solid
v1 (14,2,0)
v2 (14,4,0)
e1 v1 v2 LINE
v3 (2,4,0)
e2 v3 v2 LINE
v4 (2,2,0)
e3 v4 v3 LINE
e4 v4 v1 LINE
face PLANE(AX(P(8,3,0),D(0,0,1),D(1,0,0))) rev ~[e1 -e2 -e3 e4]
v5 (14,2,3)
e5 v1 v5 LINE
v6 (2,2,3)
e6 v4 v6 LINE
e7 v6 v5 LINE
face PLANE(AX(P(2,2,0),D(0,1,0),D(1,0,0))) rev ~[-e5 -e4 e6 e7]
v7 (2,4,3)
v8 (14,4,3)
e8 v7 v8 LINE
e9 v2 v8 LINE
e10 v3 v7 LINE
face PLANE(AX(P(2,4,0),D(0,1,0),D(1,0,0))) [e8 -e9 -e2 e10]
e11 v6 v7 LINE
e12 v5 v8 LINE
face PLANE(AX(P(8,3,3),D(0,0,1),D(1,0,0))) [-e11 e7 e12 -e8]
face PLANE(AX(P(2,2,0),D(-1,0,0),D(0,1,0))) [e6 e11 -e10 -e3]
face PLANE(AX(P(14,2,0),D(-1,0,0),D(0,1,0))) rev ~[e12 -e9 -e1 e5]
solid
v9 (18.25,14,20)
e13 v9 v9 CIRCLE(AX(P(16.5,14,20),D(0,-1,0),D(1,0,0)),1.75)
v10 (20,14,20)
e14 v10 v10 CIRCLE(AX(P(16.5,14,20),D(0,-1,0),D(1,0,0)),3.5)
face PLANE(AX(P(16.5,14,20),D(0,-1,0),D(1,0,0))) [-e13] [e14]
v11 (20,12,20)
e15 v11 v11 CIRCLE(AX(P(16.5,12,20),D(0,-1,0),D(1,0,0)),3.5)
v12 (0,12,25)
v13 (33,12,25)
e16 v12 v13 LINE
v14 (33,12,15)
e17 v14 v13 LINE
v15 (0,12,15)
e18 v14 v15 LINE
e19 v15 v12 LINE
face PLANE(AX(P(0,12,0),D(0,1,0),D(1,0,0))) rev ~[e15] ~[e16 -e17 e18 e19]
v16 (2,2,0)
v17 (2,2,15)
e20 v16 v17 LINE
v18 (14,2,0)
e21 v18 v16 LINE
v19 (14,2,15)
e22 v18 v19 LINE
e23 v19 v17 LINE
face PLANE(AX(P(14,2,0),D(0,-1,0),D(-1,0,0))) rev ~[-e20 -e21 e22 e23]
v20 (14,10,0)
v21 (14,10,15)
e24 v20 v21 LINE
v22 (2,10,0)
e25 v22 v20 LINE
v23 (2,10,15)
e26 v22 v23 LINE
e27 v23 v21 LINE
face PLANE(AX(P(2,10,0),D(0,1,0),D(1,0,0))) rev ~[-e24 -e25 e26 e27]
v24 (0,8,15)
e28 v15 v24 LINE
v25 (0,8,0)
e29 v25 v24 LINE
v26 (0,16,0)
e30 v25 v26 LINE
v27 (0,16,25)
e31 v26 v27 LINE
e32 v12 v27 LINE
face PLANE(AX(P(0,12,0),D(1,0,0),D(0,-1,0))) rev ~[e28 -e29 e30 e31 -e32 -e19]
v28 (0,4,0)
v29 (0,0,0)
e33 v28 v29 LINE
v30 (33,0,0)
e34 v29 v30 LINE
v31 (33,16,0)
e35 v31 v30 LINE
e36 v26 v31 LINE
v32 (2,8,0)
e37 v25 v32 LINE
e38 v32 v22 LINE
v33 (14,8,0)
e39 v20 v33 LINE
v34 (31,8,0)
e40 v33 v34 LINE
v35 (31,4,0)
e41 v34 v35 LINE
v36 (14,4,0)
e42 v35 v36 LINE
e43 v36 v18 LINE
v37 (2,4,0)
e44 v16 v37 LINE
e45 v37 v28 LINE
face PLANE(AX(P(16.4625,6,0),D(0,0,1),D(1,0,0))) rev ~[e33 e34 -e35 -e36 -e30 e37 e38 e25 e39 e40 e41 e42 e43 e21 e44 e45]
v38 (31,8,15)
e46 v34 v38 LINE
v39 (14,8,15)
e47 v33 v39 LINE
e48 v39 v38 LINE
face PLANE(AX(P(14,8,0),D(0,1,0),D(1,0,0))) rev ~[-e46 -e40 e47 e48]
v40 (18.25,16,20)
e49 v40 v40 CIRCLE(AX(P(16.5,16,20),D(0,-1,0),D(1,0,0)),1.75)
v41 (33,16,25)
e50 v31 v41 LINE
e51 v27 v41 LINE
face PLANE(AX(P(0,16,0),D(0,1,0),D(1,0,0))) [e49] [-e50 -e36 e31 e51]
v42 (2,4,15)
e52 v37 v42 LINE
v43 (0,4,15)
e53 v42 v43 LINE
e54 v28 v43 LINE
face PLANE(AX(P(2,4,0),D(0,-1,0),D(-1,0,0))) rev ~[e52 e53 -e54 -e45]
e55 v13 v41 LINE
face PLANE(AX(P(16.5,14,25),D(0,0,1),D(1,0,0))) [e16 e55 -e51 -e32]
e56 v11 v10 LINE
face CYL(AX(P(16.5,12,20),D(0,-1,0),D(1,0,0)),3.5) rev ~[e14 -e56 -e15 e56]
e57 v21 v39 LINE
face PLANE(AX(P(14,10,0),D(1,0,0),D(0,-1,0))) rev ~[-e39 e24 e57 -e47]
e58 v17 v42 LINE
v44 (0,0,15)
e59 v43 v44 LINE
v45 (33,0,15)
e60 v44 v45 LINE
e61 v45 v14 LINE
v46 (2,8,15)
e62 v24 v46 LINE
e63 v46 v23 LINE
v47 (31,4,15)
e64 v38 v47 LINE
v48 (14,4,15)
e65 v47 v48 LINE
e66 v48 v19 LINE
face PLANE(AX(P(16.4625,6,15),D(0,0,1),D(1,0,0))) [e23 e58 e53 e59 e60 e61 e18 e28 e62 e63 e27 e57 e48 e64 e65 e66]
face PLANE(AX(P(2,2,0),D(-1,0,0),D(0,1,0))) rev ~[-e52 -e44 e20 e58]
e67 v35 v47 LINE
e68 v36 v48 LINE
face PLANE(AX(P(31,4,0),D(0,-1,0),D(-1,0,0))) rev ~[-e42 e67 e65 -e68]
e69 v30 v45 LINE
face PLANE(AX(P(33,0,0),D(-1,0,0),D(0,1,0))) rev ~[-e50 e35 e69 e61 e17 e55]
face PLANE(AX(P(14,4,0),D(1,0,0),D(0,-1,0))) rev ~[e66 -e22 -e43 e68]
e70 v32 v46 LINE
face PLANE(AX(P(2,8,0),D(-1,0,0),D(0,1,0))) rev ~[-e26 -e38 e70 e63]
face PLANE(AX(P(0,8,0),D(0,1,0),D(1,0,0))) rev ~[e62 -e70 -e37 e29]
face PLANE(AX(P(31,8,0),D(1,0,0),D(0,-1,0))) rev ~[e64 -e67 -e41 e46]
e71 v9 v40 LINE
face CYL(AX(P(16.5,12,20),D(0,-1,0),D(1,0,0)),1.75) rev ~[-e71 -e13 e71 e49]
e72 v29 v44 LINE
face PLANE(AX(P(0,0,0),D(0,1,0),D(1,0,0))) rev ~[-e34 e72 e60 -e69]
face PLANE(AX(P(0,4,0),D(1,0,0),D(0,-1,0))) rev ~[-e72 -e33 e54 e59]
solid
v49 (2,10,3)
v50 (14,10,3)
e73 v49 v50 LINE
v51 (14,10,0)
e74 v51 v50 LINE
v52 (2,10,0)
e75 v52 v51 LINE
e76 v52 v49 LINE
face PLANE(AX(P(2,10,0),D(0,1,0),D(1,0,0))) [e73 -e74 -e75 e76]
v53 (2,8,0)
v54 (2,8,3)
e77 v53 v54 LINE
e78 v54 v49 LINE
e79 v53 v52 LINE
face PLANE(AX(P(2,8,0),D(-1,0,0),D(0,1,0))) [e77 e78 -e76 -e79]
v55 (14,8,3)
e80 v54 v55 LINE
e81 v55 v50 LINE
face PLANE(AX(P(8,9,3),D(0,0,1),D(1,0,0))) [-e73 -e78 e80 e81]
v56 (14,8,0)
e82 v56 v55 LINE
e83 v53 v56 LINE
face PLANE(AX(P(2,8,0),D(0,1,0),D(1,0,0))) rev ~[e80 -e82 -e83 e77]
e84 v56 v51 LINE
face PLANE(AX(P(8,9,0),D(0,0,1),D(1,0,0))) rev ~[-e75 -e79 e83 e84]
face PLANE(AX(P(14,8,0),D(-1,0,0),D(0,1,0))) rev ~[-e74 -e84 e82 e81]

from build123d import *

# Parameters (mm, degrees)
F0_W     = 33
F0_H     = 4
F1_DEPTH = 25
F0_W_2   = 12
F0_H_2   = 2
F2_DEPTH = 3
F3_DEPTH = 15
F4_R     = 1.75
F5_DEPTH = 25
F4_R_2   = 3.5
F6_DEPTH = 2


with BuildPart() as f1:
    # F0 (on Top) → F1 (new body)
    with BuildSketch(Plane.XY):
        with Locations((16.5, 14)):
            Rectangle(F0_W, F0_H)
    extrude(amount=F1_DEPTH)

    # F0 (on Top) → F3 (join)
    with BuildSketch(Plane.XY):
        Polygon((0, 4), (0, 0), (33, 0), (33, 12), (0, 12), (0, 8), (2, 8), (2, 10), (14, 10), (14, 8), (31, 8), (31, 4), (14, 4), (14, 2), (2, 2), (2, 4), align=None)
    extrude(amount=F3_DEPTH)

    # F4 (on face) → F5 (cut)
    with BuildSketch(Plane.XZ.offset(-12)):
        with Locations((16.5, 20)):
            Circle(F4_R)
    extrude(amount=-F5_DEPTH, mode=Mode.SUBTRACT)

    # F4 (on face) → F6 (cut)
    with BuildSketch(Plane.XZ.offset(-12)):
        with Locations((16.5, 20)):
            Circle(F4_R_2)
        with Locations((16.5, 20)):
            Circle(F4_R, mode=Mode.SUBTRACT)
    extrude(amount=-F6_DEPTH, mode=Mode.SUBTRACT)


with BuildPart() as f2:
    # F0 (on Top) → F2 (new body)
    with BuildSketch(Plane.XY):
        with Locations((8, 9)):
            Rectangle(F0_W_2, F0_H_2)
    extrude(amount=F2_DEPTH)


with BuildPart() as f2b:
    # F0 (on Top) → F2, piece 2 (new body)
    with BuildSketch(Plane.XY):
        with Locations((8, 3)):
            Rectangle(F0_W_2, F0_H_2)
    extrude(amount=F2_DEPTH)


solid = Compound([f1.part, f2.part, f2b.part])
